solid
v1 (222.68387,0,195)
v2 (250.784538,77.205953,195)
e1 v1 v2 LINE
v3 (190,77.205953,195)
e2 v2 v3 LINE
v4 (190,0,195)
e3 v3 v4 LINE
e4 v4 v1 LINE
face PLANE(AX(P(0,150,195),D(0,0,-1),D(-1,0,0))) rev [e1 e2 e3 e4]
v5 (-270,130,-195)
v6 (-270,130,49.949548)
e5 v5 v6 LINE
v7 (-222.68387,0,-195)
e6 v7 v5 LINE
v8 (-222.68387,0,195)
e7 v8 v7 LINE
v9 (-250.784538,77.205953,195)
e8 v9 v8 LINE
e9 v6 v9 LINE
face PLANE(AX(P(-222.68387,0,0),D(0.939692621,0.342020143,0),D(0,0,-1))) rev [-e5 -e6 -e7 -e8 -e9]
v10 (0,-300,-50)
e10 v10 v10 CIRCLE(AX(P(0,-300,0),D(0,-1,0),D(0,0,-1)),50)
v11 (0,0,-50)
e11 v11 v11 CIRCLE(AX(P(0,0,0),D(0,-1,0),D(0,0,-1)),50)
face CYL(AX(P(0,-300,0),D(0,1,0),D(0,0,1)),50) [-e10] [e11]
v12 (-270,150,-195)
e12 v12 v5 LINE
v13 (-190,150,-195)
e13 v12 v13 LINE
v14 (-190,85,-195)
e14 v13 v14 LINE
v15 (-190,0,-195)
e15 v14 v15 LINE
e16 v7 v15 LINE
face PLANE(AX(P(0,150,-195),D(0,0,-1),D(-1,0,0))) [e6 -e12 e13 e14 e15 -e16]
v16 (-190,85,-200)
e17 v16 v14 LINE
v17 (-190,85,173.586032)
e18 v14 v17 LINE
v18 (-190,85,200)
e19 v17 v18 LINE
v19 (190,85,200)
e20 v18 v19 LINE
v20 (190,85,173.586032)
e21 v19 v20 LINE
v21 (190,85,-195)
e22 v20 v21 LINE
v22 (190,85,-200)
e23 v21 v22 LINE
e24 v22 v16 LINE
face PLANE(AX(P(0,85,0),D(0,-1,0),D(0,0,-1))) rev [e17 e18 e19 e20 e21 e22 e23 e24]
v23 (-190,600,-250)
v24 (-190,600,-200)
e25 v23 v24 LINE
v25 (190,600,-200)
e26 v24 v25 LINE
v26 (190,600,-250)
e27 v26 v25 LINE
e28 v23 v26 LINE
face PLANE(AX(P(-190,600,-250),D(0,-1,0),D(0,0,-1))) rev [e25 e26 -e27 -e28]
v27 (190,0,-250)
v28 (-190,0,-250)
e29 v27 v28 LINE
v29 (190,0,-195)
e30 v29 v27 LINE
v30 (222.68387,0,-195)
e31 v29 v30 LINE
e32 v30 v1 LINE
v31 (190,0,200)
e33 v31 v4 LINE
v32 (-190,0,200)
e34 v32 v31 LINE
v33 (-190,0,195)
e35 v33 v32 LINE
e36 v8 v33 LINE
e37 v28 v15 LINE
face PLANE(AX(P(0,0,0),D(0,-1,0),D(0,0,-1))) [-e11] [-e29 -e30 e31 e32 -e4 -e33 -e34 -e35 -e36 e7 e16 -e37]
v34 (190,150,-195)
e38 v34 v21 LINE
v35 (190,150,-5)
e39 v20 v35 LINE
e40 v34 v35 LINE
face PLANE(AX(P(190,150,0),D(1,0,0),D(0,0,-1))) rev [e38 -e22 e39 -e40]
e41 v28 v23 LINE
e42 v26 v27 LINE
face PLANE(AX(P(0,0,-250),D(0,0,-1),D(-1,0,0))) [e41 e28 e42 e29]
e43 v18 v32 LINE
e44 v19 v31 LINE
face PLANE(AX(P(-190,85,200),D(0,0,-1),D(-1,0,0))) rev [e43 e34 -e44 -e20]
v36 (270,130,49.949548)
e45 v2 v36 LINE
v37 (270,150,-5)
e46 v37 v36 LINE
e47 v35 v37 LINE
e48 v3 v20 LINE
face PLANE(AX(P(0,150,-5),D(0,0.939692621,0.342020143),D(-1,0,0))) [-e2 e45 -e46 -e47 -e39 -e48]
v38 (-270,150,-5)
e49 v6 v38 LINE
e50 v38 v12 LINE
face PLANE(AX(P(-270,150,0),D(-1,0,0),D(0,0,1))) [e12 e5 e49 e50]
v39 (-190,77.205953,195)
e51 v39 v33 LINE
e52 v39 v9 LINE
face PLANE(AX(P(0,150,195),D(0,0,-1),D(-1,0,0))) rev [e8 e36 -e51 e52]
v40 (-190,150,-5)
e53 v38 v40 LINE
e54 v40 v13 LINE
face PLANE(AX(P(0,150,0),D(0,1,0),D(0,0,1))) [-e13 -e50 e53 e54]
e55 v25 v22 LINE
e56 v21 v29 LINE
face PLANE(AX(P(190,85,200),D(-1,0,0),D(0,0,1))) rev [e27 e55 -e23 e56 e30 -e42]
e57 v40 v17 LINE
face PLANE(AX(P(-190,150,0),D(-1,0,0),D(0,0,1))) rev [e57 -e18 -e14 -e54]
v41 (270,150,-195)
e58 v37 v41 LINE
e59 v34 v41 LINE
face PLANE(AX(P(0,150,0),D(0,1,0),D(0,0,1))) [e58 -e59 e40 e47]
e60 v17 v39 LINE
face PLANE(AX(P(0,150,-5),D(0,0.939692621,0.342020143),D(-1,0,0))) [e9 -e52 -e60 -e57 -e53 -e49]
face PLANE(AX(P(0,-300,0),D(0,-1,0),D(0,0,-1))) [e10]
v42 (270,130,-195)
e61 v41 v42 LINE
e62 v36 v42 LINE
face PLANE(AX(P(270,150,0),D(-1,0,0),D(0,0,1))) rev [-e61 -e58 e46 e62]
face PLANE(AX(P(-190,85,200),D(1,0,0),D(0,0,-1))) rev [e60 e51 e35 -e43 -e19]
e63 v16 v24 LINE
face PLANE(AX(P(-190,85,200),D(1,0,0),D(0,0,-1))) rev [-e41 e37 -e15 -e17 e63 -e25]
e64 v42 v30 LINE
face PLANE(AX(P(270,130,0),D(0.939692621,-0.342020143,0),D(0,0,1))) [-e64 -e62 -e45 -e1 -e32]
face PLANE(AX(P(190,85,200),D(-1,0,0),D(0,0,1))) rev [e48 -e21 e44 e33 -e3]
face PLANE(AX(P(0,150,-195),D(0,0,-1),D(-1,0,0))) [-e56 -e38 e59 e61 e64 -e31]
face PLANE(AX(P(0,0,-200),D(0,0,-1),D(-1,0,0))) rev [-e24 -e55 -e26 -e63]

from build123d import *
from OCP.BRepFilletAPI import BRepFilletAPI_MakeChamfer

# Parameters (mm, degrees)
SKETCH1_W           = 380
SKETCH1_H           = 400
BOSS_EXTRUDE1_DEPTH = 85
SKETCH2_W           = 80
SKETCH2_H           = 390
BOSS_EXTRUDE2_DEPTH = 150
CHAMFER1_SIZE       = 72.794046853
CHAMFER1_SIZE_2     = 200
CHAMFER2_SIZE       = 130
CHAMFER2_SIZE2      = 47.316130455
SKETCH3_W           = 380
SKETCH3_H           = 600
BOSS_EXTRUDE3_DEPTH = 50
SKETCH4_R           = 50
BOSS_EXTRUDE4_DEPTH = 300


with BuildPart() as part:
    # Sketch1 → Boss-Extrude1 (new body)
    with BuildSketch(Plane(origin=(0, 0, 0), x_dir=(1, 0, 0), z_dir=(0, 1, 0))):
        Rectangle(SKETCH1_W, SKETCH1_H)
    extrude(amount=BOSS_EXTRUDE1_DEPTH)

    # Sketch2 → Boss-Extrude2 (add)
    with BuildSketch(Plane(origin=(0, 0, 0), x_dir=(1, 0, 0), z_dir=(0, 1, 0))):
        with Locations((-230, 0)):
            Rectangle(SKETCH2_W, SKETCH2_H)
        with Locations((230, 0)):
            Rectangle(SKETCH2_W, SKETCH2_H)
    extrude(amount=BOSS_EXTRUDE2_DEPTH)

    # Chamfer1
    # the kernel refuses this chamfer: 200, 72.794046853 mm, written as the material it takes off along each edge
    with BuildSketch(Plane(origin=(-788.83894651, 150, 195), x_dir=(0, -0.9950833631817488, 0.09904090225204945), z_dir=(1, 0, 0)), Plane(origin=(190, 150, 195), x_dir=(0, -0.9950833631817488, 0.09904090225204945), z_dir=(1, 0, 0))) as chamfer1_piece_1:
        Polygon((CHAMFER1_SIZE * 0.995083363185, CHAMFER1_SIZE * 0.0990409022524), (-CHAMFER1_SIZE_2 * 0.099040902252, CHAMFER1_SIZE_2 * 0.995083363182), (0, 0), align=None)
    extrude(amount=598.83894651, mode=Mode.SUBTRACT)
    with BuildSketch(Plane(origin=(-788.83894651, 150, 195), x_dir=(0, -0.9950833631817488, 0.09904090225204945), z_dir=(1, 0, 0))) as chamfer1_piece_2_section:
        Polygon((CHAMFER1_SIZE * 0.995083363185, CHAMFER1_SIZE * 0.0990409022524), (-CHAMFER1_SIZE_2 * 0.099040902252, CHAMFER1_SIZE_2 * 0.995083363182), (0, 0), align=None)
    chamfer1_piece_2 = extrude(amount=1117.67789302, mode=Mode.PRIVATE)
    chamfer1_piece_2 = split(chamfer1_piece_2, bisect_by=Plane(origin=(190, 82.401984382, 187.862010755), z_dir=(1, 0, 0)), keep=Keep.TOP, mode=Mode.PRIVATE)
    add(chamfer1_piece_2, mode=Mode.SUBTRACT)
    with BuildSketch(Plane(origin=(-328.83894651, 150, 195), x_dir=(0, -0.9950833631817488, 0.09904090225204945), z_dir=(1, 0, 0))) as chamfer1_piece_3_section:
        Polygon((CHAMFER1_SIZE * 0.995083363185, CHAMFER1_SIZE * 0.0990409022524), (-CHAMFER1_SIZE_2 * 0.099040902252, CHAMFER1_SIZE_2 * 0.995083363182), (0, 0), align=None)
    chamfer1_piece_3 = extrude(amount=1117.67789302, mode=Mode.PRIVATE)
    chamfer1_piece_3 = split(chamfer1_piece_3, bisect_by=Plane(origin=(-190, 82.401984382, 187.862010755), z_dir=(-1, 0, 0)), keep=Keep.TOP, mode=Mode.PRIVATE)
    add(chamfer1_piece_3, mode=Mode.SUBTRACT)

    # Chamfer2: one chamfer whose edges measure the first distance from different faces: ONE call of the kernel's chamfer builder (chamfer() names one face for all edges)
    chamfer2_edges_1 = [part.edges().sort_by_distance(p)[0] for p in [
        (270, 0, 0),
    ]]
    chamfer2_side_1 = [part.faces().sort_by_distance(p)[0] for p in [
        (270, 67.789562339, -18.238567166),
    ]]
    chamfer2_edges_2 = [part.edges().sort_by_distance(p)[0] for p in [
        (-270, 0, 0),
    ]]
    chamfer2_side_2 = [part.faces().sort_by_distance(p)[0] for p in [
        (-270, 67.789562339, -18.238567166),
    ]]
    chamfer2 = BRepFilletAPI_MakeChamfer(part.part.solid().wrapped)
    for e in chamfer2_edges_1:
        chamfer2.Add(CHAMFER2_SIZE, CHAMFER2_SIZE2, e.wrapped, chamfer2_side_1[0].wrapped)  # the first distance lies on this face
    for e in chamfer2_edges_2:
        chamfer2.Add(CHAMFER2_SIZE, CHAMFER2_SIZE2, e.wrapped, chamfer2_side_2[0].wrapped)  # the first distance lies on this face
    add(Compound.cast(chamfer2.Shape()), mode=Mode.REPLACE)

    # Sketch3 → Boss-Extrude3 (add)
    with BuildSketch(Plane(origin=(0, 0, -200), x_dir=(-1, 0, 0), z_dir=(0, 0, -1))):
        with Locations((0, 300)):
            Rectangle(SKETCH3_W, SKETCH3_H)
    extrude(amount=BOSS_EXTRUDE3_DEPTH)

    # Sketch4 → Boss-Extrude4 (add)
    with BuildSketch(Plane.XZ):
        with Locations(Location((0, 0, 0), (0, 0, 270))):
            Circle(SKETCH4_R)
    extrude(amount=BOSS_EXTRUDE4_DEPTH)


solid = part.part
